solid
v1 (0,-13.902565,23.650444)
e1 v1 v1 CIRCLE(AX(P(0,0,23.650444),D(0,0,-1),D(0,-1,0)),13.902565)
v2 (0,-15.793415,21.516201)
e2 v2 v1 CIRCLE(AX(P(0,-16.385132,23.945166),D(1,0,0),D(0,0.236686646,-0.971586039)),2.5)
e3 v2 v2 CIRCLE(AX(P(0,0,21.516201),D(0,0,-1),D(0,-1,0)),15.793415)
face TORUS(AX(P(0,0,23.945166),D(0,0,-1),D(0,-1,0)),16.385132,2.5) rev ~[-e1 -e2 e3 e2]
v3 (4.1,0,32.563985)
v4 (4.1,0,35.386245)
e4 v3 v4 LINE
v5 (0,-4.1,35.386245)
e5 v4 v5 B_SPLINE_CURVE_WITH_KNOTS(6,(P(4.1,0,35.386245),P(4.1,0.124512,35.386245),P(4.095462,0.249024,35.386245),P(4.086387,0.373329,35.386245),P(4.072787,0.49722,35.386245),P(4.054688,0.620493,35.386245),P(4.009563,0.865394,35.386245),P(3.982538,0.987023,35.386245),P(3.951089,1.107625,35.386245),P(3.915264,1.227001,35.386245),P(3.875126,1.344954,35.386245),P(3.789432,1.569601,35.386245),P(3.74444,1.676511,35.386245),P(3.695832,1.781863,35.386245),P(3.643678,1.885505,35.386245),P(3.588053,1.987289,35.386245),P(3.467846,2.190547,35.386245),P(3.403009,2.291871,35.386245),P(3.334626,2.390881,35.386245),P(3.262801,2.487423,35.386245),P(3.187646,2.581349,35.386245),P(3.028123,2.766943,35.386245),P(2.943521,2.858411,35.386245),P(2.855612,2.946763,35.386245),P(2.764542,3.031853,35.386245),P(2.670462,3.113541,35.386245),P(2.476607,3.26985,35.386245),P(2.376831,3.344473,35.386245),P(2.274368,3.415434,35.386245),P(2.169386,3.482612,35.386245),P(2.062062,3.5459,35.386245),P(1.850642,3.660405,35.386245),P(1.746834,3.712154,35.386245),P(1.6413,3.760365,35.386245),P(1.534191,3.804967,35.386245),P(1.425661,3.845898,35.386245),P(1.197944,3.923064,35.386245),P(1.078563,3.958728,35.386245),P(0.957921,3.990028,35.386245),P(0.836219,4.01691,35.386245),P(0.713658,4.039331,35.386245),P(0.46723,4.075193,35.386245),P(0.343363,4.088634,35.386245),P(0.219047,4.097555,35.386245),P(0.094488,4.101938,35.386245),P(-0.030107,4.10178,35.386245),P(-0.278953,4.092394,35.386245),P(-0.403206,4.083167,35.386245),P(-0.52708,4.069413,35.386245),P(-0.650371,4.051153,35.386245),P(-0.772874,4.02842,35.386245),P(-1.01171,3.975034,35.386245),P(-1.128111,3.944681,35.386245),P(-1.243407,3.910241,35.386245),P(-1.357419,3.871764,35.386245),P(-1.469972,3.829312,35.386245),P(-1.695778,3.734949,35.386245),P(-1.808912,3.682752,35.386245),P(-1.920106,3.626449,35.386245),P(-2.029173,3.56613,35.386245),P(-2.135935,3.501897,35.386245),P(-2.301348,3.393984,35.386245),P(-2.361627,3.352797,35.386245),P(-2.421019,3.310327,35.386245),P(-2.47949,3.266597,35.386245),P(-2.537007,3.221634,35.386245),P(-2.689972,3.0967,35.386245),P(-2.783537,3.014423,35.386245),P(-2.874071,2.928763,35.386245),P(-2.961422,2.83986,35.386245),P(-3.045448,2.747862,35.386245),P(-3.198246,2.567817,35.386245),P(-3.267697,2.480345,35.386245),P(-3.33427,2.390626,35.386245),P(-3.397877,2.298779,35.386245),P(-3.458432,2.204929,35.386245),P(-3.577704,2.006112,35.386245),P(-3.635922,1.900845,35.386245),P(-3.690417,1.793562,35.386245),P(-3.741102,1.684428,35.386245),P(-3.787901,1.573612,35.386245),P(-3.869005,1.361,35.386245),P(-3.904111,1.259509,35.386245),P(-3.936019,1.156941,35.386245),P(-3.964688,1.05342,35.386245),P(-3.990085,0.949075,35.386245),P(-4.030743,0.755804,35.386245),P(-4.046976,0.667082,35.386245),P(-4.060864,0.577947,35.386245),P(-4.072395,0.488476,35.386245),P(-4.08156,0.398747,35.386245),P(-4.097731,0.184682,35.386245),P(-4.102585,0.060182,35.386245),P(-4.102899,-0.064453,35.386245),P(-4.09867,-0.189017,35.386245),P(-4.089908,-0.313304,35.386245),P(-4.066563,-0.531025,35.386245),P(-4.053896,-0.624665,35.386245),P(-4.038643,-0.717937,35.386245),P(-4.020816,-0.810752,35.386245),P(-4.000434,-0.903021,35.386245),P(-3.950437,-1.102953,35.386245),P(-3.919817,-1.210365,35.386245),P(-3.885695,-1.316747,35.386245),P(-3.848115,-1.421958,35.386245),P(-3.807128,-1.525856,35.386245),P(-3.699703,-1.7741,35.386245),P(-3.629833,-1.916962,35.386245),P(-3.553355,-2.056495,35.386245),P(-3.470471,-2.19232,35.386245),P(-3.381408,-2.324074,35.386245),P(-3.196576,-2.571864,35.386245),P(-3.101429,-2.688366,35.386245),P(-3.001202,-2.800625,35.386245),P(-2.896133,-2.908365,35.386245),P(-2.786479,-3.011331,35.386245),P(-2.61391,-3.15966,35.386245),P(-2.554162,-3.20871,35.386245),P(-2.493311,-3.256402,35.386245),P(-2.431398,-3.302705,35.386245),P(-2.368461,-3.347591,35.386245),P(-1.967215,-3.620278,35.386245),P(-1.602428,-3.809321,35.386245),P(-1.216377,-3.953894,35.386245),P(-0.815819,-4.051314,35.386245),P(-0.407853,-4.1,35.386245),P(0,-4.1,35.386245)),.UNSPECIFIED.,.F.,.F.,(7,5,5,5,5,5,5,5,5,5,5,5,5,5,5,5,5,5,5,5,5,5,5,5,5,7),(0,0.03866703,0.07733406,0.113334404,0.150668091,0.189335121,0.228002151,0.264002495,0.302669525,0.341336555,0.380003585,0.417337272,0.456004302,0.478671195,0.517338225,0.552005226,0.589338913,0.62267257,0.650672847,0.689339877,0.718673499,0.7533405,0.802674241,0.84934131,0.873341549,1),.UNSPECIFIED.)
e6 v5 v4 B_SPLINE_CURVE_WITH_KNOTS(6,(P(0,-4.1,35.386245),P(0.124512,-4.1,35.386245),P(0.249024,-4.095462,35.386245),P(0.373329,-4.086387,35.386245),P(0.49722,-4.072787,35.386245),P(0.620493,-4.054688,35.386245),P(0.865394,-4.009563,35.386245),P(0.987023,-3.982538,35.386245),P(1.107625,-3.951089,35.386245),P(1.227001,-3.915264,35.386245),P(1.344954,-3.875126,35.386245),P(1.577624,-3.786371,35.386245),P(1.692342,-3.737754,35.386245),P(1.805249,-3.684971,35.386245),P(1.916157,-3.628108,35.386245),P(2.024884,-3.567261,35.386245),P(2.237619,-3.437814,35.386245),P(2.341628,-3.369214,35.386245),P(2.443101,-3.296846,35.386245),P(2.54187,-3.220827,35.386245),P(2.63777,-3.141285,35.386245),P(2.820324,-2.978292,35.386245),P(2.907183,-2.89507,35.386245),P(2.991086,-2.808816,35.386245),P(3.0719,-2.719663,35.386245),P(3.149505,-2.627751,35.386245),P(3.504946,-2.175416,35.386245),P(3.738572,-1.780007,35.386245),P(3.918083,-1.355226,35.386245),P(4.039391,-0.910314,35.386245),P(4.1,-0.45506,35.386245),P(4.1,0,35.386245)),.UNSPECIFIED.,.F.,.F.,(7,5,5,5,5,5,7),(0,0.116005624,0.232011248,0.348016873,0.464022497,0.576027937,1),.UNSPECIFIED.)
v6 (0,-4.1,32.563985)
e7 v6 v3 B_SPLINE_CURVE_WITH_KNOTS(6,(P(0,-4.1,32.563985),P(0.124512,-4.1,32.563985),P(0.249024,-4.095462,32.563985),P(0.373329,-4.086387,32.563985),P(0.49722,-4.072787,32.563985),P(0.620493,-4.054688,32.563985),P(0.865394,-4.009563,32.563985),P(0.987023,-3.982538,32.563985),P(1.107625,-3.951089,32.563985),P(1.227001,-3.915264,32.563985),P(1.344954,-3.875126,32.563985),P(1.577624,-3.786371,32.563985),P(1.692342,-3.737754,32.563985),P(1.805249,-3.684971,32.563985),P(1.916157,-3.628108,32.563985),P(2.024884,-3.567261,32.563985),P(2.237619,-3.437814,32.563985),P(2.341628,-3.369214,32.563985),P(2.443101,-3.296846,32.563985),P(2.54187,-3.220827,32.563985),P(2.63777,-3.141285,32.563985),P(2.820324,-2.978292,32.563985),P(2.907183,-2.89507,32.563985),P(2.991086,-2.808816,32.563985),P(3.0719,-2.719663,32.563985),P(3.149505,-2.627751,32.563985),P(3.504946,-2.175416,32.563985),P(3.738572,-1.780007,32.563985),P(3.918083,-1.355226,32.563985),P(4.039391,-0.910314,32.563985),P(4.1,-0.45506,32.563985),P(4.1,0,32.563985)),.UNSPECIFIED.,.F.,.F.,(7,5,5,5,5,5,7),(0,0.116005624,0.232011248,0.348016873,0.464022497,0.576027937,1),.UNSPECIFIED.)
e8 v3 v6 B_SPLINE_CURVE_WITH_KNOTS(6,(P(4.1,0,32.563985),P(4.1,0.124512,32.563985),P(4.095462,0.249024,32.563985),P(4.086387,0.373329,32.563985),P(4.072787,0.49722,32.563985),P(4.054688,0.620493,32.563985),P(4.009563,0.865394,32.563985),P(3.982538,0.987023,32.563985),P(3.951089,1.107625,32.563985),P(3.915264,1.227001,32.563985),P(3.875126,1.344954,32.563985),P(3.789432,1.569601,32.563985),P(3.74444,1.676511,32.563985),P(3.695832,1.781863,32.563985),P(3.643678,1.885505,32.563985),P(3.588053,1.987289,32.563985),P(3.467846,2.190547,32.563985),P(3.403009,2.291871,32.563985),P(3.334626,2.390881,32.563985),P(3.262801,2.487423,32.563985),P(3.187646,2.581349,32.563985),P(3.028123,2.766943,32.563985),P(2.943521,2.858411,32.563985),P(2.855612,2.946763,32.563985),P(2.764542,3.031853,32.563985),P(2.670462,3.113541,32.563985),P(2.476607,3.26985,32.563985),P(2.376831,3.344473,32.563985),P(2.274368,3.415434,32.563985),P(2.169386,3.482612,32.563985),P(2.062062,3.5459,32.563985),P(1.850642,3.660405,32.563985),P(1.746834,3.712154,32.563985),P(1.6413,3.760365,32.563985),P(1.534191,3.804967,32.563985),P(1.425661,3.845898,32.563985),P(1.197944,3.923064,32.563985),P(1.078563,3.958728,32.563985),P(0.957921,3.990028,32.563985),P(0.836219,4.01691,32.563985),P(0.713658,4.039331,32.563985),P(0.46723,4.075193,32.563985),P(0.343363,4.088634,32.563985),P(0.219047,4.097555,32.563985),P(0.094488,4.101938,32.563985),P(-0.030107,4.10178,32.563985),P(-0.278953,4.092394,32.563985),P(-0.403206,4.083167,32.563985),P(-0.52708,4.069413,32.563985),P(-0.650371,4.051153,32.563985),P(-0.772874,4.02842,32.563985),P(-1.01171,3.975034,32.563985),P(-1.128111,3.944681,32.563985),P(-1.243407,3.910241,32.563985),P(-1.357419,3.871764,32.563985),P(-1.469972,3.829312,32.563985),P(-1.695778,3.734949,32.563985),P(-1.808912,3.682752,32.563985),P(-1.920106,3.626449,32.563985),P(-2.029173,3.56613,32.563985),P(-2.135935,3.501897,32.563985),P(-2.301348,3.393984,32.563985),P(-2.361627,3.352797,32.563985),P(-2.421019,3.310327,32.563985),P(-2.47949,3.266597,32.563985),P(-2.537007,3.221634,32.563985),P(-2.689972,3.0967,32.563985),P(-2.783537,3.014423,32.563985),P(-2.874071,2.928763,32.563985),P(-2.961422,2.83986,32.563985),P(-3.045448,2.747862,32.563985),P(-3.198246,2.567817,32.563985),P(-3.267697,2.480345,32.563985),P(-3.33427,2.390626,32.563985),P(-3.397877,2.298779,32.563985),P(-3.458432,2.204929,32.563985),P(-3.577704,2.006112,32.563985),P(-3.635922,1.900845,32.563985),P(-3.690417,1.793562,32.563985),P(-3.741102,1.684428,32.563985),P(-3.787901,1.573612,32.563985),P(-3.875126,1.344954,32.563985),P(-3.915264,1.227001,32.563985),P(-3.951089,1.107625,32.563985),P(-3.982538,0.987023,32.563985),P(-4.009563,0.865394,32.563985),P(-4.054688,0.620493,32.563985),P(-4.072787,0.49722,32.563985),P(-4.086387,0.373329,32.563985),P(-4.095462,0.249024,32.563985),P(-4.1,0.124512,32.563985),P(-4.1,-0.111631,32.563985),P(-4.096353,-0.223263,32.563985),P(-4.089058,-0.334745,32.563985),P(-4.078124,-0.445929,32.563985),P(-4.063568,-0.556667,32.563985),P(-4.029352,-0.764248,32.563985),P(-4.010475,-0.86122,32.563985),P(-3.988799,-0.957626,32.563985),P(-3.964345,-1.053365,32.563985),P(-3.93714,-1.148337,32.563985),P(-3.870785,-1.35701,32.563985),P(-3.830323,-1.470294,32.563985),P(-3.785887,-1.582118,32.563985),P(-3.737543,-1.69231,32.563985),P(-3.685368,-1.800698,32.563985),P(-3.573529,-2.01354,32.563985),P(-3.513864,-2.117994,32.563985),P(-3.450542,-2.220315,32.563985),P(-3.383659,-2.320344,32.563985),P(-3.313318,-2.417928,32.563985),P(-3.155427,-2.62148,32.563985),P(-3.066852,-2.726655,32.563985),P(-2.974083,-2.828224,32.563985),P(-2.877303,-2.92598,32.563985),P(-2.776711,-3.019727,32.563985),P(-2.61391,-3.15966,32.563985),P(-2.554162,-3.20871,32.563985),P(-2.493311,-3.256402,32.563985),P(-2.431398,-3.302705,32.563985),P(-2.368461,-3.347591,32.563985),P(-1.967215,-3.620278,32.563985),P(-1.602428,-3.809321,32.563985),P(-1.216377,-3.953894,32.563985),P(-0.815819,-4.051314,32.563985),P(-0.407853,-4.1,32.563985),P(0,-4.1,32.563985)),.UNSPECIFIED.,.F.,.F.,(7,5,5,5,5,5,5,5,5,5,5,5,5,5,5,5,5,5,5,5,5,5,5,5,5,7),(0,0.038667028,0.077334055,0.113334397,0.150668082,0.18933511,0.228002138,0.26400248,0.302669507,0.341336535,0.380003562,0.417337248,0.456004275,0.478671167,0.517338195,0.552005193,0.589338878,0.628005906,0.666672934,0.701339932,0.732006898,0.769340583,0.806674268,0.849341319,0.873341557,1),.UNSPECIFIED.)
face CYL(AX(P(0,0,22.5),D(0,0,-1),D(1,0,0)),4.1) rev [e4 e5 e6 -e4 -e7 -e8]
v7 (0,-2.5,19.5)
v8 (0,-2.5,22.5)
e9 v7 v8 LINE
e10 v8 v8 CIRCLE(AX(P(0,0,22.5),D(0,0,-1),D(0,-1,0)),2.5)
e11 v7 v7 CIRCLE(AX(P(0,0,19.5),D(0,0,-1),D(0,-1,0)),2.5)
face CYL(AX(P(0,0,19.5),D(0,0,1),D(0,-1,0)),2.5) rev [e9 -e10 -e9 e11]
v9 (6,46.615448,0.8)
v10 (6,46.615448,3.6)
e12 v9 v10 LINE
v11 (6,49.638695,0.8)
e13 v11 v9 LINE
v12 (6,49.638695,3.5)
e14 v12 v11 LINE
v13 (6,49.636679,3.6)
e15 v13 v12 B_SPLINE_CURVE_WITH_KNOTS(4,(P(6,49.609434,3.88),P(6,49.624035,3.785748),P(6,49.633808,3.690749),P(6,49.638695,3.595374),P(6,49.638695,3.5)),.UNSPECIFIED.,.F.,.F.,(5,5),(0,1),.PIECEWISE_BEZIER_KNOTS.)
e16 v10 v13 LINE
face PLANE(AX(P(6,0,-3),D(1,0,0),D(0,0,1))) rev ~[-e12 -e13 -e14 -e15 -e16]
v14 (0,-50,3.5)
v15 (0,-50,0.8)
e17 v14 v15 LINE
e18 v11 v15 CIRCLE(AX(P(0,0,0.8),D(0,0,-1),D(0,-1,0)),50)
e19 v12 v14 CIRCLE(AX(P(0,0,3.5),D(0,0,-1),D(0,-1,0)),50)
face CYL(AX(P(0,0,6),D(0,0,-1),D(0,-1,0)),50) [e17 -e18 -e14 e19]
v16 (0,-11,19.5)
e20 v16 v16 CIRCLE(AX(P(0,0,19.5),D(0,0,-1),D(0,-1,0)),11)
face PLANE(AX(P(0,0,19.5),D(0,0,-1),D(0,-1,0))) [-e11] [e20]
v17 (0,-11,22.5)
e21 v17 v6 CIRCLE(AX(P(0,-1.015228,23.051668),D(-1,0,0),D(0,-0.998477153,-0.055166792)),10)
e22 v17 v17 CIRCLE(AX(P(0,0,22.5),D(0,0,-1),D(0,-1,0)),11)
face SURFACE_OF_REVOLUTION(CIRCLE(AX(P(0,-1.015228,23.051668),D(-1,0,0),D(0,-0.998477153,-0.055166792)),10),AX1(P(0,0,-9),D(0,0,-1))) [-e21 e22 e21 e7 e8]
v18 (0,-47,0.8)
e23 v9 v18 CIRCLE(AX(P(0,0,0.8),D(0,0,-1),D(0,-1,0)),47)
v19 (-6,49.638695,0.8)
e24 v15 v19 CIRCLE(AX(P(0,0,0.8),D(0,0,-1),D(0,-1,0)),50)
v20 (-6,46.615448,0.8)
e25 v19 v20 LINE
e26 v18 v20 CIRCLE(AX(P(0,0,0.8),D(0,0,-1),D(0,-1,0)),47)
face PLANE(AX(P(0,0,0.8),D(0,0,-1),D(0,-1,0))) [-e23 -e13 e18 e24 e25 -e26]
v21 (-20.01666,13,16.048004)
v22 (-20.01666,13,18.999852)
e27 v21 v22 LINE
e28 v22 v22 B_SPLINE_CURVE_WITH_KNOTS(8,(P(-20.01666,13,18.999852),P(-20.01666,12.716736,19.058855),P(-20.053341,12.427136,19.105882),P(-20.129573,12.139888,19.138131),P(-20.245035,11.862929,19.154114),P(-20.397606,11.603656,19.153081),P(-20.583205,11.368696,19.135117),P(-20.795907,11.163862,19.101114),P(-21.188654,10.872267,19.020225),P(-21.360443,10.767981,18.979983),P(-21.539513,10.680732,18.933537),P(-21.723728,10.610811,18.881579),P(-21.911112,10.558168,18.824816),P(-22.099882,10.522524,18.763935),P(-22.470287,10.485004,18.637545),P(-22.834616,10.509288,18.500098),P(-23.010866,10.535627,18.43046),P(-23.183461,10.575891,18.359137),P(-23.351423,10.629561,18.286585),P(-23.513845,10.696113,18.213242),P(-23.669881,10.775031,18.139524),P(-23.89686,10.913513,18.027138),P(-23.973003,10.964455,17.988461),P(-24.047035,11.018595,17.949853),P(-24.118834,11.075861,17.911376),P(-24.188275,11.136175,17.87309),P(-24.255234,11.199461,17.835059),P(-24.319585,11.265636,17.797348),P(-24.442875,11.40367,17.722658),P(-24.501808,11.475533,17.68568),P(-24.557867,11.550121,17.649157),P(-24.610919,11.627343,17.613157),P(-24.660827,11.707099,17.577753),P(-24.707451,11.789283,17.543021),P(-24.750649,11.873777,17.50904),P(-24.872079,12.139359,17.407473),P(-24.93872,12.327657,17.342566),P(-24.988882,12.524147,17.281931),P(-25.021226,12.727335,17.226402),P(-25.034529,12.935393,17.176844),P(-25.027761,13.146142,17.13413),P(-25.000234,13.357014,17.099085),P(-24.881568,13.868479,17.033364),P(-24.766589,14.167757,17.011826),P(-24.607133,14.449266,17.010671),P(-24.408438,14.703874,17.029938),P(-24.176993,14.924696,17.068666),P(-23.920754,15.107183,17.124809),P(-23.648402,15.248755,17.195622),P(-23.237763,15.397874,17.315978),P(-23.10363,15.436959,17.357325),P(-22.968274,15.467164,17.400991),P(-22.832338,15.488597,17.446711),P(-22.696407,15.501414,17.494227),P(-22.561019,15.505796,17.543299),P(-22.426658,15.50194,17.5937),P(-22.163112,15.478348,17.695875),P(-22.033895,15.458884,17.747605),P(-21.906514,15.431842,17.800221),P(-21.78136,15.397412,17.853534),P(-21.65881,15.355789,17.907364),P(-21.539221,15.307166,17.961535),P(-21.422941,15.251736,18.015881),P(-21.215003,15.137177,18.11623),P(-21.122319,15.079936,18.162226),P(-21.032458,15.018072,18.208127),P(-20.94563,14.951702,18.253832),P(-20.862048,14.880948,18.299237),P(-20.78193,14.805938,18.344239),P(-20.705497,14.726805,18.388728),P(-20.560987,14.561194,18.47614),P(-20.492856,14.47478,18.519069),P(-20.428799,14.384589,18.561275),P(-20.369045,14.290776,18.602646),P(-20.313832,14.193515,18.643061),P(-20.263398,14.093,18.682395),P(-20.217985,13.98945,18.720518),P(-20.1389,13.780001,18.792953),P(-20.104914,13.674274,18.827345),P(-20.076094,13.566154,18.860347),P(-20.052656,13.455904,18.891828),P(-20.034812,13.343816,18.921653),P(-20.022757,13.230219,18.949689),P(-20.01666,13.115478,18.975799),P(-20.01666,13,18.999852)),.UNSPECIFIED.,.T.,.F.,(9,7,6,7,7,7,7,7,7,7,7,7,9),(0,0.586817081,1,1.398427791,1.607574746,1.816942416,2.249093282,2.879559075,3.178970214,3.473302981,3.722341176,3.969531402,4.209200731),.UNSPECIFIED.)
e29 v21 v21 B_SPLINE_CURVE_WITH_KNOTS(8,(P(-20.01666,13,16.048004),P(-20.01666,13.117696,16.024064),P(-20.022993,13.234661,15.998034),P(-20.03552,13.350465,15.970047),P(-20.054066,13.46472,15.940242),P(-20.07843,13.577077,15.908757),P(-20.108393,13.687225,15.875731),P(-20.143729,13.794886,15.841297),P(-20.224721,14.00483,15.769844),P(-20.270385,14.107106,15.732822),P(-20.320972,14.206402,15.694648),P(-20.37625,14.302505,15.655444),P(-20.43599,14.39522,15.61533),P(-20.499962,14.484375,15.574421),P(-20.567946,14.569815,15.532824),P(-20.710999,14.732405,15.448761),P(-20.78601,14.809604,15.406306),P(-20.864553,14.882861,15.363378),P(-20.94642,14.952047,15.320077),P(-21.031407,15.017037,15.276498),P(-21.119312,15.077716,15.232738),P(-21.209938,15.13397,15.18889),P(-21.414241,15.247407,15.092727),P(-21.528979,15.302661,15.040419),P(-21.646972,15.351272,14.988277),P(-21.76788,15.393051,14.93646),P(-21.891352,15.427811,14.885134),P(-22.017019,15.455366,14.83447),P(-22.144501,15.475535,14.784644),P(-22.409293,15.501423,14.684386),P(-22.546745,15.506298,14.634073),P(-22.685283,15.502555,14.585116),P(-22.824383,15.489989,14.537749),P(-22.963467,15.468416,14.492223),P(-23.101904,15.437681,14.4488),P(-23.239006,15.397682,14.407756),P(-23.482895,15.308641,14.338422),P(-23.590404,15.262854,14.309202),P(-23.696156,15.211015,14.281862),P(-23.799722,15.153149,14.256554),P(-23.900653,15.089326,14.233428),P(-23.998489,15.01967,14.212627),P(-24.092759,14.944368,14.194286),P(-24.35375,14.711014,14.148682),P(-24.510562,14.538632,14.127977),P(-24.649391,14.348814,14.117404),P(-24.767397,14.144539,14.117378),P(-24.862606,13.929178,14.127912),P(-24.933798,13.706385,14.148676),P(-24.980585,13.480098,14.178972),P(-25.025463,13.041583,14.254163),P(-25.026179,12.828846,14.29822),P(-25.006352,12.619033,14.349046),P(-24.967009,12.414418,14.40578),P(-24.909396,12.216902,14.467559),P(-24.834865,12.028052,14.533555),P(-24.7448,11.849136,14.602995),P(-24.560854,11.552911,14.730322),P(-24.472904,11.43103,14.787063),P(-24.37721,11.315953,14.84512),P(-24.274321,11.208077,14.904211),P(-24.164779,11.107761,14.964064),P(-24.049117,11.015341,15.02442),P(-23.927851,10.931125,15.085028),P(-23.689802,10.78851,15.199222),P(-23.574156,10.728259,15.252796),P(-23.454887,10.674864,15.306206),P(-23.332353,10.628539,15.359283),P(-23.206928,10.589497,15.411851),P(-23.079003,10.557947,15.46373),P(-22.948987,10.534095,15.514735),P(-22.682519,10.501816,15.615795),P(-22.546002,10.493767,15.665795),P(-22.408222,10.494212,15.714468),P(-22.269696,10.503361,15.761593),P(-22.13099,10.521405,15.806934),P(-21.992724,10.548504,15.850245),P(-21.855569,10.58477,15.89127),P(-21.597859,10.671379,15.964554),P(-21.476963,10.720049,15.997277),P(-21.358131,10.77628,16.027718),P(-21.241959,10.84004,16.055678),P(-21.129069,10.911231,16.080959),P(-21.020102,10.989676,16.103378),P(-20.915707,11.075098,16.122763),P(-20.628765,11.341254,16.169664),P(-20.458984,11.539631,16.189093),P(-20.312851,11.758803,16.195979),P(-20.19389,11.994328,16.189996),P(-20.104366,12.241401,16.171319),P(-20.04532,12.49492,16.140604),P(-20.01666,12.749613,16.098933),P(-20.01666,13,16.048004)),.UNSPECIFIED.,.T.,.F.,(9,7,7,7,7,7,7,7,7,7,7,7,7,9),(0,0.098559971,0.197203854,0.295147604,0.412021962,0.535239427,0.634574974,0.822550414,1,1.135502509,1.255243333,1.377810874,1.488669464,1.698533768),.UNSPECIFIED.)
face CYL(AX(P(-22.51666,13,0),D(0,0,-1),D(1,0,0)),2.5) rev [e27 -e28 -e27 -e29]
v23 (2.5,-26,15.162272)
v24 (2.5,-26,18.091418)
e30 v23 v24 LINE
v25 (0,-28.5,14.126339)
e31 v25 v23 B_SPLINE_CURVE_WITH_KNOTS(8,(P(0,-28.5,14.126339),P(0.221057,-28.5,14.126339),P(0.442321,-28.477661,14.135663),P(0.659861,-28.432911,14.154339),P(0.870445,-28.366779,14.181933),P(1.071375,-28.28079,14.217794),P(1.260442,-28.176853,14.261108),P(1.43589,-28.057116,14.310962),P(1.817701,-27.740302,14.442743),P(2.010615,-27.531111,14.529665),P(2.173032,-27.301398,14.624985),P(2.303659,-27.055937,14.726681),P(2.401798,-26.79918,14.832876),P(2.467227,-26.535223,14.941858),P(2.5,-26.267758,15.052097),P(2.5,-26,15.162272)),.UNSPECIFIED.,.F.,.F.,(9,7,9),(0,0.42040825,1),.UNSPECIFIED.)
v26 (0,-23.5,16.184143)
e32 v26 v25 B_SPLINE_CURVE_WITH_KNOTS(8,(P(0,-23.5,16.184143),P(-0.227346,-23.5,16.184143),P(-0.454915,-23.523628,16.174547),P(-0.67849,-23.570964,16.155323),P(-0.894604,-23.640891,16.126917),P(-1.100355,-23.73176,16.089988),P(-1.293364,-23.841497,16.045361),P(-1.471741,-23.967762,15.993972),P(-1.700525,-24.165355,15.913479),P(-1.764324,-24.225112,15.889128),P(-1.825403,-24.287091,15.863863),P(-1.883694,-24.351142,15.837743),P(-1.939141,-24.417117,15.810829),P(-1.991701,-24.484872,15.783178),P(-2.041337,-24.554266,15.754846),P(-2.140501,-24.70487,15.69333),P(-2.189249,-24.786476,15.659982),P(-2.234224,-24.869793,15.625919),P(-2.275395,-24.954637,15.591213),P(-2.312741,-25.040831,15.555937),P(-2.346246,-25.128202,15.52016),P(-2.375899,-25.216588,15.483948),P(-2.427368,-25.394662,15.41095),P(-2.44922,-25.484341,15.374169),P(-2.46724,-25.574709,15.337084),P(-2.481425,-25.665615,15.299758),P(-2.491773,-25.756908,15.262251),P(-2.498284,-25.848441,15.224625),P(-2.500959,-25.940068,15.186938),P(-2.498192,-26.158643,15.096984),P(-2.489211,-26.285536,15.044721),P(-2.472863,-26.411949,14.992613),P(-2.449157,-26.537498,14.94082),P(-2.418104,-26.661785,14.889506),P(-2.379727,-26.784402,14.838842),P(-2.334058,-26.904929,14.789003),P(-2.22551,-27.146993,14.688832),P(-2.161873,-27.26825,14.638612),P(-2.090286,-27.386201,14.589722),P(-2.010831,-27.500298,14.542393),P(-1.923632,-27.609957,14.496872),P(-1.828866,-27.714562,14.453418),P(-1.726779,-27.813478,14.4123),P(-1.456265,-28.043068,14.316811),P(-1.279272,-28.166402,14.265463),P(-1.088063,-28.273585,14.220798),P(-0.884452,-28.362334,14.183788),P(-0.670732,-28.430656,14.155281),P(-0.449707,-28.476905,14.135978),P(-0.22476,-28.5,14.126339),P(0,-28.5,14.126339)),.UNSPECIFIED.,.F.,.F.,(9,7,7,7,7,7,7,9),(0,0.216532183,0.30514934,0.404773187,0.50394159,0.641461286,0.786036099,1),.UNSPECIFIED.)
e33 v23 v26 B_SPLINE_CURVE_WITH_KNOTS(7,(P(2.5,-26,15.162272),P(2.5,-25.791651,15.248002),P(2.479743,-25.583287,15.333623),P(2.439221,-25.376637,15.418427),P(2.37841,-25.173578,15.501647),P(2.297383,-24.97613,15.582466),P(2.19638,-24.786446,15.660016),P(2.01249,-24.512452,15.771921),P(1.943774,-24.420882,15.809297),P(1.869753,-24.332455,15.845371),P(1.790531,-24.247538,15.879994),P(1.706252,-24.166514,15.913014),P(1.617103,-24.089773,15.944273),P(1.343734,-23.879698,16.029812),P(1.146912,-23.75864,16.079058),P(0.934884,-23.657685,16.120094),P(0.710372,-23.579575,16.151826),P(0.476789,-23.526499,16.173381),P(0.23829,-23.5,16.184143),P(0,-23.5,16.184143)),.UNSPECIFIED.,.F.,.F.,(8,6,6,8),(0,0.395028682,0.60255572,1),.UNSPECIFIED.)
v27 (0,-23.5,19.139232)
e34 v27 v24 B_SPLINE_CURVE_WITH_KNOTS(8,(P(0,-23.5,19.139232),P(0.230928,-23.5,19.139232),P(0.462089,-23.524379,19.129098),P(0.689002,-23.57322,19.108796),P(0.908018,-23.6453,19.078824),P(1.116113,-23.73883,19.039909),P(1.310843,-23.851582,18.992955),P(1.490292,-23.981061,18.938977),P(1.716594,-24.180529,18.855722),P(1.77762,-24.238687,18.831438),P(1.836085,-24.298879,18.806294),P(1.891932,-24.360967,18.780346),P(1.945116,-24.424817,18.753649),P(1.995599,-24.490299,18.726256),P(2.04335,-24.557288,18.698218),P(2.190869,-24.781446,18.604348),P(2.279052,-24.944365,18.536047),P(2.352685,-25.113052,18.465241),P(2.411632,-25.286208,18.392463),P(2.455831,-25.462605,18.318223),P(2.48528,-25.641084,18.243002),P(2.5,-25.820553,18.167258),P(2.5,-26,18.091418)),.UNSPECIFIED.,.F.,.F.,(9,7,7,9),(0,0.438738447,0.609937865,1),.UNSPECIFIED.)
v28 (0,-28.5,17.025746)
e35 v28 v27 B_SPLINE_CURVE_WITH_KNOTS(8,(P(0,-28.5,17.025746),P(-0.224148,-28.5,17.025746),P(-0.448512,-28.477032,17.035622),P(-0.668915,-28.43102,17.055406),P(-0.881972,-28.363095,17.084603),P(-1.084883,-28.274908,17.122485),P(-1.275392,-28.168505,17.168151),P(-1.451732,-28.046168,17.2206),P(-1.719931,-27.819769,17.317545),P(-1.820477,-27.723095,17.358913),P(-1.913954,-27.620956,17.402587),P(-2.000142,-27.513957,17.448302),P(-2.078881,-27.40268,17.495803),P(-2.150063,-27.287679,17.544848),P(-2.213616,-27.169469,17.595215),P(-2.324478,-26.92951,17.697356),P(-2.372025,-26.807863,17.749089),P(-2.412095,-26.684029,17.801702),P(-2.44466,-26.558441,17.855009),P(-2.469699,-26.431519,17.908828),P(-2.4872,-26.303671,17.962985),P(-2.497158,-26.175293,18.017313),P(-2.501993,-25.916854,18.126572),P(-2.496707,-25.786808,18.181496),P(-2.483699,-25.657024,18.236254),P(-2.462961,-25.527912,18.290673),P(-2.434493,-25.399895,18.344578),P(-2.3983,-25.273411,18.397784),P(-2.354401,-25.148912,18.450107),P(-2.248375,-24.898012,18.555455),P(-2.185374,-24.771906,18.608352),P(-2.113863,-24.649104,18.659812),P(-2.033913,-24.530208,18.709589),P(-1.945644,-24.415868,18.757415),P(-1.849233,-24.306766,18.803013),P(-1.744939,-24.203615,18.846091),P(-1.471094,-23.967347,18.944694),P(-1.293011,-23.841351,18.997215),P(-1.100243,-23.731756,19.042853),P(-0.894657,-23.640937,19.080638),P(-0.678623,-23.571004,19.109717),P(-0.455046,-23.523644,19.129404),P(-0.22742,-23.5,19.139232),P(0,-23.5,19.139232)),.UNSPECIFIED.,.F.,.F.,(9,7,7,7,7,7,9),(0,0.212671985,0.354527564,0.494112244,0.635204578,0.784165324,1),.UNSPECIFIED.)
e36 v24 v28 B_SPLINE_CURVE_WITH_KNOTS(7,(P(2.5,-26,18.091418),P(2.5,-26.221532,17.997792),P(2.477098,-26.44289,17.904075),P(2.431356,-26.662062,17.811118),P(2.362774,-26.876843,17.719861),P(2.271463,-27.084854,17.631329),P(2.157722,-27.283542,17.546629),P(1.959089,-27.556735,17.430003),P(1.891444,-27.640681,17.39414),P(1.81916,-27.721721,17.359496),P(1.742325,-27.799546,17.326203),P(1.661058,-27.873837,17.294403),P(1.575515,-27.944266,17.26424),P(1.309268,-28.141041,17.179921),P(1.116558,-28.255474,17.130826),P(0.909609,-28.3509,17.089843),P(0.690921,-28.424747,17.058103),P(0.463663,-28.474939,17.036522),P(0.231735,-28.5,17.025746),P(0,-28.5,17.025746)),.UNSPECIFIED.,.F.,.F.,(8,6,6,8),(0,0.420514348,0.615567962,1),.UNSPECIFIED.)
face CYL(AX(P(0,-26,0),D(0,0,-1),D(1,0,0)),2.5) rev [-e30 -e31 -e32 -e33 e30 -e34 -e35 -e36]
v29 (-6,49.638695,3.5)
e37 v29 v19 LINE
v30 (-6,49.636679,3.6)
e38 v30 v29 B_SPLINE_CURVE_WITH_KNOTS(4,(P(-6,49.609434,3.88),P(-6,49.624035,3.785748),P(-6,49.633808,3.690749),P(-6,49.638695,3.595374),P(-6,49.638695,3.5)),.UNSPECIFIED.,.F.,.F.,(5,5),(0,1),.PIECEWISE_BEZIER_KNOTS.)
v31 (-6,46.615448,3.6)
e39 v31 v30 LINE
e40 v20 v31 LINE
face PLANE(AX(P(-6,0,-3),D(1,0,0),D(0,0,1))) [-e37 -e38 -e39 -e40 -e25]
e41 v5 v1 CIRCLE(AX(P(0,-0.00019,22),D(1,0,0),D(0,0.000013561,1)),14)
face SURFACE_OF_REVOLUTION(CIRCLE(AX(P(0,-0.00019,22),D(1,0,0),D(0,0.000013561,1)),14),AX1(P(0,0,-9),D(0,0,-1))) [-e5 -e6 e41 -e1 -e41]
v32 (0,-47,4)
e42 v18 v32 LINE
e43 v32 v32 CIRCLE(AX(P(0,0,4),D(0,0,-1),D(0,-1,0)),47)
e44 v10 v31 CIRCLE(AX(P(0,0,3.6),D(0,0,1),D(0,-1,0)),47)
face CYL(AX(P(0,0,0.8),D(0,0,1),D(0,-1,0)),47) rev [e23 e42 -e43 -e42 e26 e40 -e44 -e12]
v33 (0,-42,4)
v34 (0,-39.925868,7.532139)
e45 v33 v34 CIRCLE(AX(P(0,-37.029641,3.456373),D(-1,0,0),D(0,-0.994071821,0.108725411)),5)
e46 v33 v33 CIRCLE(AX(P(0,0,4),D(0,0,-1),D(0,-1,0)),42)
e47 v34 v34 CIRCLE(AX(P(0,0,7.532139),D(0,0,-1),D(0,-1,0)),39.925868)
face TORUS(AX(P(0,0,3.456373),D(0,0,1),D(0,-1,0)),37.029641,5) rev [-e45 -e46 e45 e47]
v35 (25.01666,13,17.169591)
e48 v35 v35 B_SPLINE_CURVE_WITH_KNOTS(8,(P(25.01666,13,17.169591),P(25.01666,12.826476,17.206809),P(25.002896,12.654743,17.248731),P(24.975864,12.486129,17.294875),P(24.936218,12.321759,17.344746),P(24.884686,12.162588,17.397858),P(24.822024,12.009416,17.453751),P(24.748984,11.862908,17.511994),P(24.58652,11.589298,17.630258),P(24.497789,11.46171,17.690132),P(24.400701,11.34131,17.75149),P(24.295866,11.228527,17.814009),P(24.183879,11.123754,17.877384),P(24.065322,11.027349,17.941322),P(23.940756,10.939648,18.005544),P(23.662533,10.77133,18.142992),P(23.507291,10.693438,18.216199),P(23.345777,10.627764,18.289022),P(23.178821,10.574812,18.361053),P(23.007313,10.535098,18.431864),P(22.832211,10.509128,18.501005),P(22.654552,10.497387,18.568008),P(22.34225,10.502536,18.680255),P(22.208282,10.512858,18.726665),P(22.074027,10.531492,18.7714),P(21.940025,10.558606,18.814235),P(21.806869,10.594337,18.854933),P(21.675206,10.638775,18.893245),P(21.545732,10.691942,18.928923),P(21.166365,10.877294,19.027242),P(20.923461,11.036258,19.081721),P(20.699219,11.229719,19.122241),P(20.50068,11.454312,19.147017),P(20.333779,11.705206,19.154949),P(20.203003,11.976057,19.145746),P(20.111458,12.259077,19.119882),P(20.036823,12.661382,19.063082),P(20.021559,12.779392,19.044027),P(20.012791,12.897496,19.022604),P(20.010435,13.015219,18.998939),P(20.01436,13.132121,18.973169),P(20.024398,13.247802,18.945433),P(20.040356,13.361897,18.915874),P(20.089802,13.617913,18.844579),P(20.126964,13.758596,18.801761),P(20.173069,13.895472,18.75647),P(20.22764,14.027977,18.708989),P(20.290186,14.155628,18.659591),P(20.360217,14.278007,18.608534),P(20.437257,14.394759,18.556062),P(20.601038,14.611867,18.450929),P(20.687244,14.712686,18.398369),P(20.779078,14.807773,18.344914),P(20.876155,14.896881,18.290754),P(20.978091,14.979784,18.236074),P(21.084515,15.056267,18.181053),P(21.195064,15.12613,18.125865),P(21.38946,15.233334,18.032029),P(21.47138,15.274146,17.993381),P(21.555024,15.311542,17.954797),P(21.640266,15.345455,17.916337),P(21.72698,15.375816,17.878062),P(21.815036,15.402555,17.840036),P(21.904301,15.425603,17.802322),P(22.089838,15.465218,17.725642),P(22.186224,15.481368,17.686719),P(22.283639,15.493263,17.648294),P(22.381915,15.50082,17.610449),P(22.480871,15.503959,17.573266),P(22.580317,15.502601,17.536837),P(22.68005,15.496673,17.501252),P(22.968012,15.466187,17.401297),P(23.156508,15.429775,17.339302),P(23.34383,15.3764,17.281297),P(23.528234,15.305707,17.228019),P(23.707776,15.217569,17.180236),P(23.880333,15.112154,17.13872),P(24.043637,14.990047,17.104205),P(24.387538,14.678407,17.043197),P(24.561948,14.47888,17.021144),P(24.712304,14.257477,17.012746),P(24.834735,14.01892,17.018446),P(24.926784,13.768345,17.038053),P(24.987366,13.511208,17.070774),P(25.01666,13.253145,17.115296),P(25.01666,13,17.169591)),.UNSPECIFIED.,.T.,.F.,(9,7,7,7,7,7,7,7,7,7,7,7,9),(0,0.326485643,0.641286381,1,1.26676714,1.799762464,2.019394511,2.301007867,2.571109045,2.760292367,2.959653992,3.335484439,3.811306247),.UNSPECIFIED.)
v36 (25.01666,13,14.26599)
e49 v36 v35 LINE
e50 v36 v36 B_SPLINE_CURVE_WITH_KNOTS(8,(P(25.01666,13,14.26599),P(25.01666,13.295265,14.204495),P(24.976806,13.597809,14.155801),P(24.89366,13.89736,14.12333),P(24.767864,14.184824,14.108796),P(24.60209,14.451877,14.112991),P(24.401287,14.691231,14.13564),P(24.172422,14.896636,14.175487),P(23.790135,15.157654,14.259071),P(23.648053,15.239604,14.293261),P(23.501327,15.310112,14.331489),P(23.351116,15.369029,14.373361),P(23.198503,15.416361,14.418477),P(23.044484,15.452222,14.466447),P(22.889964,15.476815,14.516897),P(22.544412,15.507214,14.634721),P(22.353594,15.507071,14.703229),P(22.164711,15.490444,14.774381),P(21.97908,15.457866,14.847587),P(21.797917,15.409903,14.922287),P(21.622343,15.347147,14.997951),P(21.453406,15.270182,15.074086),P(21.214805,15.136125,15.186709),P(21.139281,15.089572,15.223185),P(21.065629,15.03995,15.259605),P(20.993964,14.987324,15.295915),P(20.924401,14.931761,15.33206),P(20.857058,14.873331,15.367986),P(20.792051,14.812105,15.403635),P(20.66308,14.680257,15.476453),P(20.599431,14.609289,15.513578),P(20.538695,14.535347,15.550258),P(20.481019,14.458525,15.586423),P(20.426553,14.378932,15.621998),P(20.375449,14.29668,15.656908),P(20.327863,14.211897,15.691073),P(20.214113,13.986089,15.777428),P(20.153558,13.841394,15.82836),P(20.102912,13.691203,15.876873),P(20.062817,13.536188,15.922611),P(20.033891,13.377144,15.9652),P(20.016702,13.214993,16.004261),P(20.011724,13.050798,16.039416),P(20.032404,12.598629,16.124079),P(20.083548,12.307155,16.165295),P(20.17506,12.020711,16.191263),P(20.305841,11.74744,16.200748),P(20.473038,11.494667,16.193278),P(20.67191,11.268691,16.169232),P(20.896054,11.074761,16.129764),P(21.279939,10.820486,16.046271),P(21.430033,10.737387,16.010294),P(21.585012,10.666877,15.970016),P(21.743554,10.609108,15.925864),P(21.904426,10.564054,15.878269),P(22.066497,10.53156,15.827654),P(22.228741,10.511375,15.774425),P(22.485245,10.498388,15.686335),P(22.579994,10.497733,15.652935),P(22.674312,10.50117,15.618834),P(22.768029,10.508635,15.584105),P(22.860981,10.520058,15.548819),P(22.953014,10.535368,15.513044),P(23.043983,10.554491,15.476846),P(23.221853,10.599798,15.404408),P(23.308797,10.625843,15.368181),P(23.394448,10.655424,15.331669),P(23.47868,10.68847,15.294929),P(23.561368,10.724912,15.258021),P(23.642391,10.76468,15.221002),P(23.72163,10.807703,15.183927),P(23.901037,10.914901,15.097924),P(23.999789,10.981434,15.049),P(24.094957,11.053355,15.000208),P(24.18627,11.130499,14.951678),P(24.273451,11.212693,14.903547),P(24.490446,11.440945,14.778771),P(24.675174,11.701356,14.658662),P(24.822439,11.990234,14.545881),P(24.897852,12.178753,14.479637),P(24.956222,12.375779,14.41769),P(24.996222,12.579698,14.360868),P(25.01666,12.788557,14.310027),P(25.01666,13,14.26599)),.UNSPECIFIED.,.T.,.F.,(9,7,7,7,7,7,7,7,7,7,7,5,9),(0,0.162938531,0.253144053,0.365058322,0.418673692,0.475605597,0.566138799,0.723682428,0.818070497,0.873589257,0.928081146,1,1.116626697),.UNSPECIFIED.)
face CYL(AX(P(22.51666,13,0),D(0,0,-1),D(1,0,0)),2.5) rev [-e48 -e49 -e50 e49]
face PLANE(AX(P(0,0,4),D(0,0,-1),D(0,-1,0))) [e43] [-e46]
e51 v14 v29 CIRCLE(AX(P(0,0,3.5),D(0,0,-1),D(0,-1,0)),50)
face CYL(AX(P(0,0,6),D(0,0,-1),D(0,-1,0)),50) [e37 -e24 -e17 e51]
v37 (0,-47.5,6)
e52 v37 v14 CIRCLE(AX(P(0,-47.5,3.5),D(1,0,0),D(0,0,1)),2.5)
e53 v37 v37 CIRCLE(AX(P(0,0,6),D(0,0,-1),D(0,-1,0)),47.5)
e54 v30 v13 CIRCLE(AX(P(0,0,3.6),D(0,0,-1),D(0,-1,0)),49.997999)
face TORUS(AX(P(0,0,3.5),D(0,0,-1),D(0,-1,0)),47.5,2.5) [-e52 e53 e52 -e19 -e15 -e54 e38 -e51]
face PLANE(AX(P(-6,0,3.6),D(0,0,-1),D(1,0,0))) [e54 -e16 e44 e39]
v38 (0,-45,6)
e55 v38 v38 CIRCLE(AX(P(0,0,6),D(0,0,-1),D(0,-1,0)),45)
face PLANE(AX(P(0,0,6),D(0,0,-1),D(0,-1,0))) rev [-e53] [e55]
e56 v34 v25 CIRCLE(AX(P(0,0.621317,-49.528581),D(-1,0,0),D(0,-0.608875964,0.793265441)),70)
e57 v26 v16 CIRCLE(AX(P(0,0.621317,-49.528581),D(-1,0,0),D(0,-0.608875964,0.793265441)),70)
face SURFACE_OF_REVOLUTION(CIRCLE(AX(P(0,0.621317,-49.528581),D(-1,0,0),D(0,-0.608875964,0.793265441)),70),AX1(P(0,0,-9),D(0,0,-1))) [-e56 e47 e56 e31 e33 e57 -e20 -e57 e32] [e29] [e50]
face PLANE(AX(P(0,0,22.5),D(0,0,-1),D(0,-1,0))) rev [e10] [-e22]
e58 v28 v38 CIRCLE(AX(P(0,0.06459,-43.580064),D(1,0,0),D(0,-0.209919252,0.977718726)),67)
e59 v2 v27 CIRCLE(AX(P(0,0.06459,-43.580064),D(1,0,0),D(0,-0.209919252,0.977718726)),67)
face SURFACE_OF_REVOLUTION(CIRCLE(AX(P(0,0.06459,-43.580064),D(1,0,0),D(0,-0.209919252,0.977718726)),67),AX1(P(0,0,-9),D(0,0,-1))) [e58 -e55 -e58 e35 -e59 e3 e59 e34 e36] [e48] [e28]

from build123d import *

# Parameters (mm, degrees)
F2_R      = 20
F3_DEPTH  = 25
F4_R      = 2.5
F5_DEPTH  = 25
F7_W      = 12
F7_H      = 6.6
F8_DEPTH  = 60
F9_R      = 4.1
F9_R_2    = 2.5
F10_DEPTH = 15


# Not quite as in the source:
# - a fillet or chamfer that OpenCascade refuses, or shapes differently, is made with other operations: its cross-section is extruded or revolved along the edge and cut away or added
# - a feature names something its author has since deleted; it is built from what else it names


with BuildPart() as f1:
    # F0 (on Right) → F1 (revolve)
    with BuildSketch(Plane.YZ):
        with BuildLine():
            Line((-47, 0.8), (-47, 2))
            Line((-47, 2), (-47, 4))
            Line((-47, 4), (-42, 4))
            Line((-42, 4), (-42, 6))
            ThreePointArc((-42, 6), (-27.3273562245, 14.6498550341), (-11, 19.5))
            Line((-11, 19.5), (-2.5, 19.5))
            Line((-2.5, 19.5), (-2.5, 22.5))
            Line((-2.5, 22.5), (-11, 22.5))
            ThreePointArc((-11, 22.5), (-7.9199859369, 30.2852233625), (0, 33))
            Line((0, 33), (0, 36))
            ThreePointArc((0, 36), (-9.9253616904, 31.873751261), (-14, 21.9270907164))
            ThreePointArc((-14, 21.9270907164), (-30.5537547763, 16.0145412775), (-45, 6))
            Line((-45, 6), (-50, 6))
            Line((-50, 6), (-50, 0.8))
            Line((-50, 0.8), (-47, 0.8))
        make_face()
    revolve(axis=Axis((0, 0, -9), (0, 0, -1)))

    # F2 (on Top) → F3 (cut)
    with BuildSketch(Plane.XY):
        Circle(F2_R)
    extrude(amount=-F3_DEPTH, mode=Mode.SUBTRACT)

    # F4 (on Top) → F5 (cut)
    with BuildSketch(Plane.XY):
        with Locations((0, -26)):
            Circle(F4_R)
        with Locations((-22.5166604984, 13)):
            Circle(F4_R)
        with Locations((22.5166604984, 13)):
            Circle(F4_R)
    extrude(amount=F5_DEPTH, mode=Mode.SUBTRACT)

    # F6: fillet of radius 5 on 1 edges, made by hand

    # F6_s1 → F6_t2 (revolve)
    with BuildSketch(Plane.YZ):
        with BuildLine():
            ThreePointArc((-42, 4), (-41.3412296148, 5.9882107587), (-39.9258684636, 7.532138624))
            ThreePointArc((-39.9258684636, 7.532138624), (-40.9699899366, 6.7756209672), (-42, 6))
            Line((-42, 6), (-42, 4))
        make_face()
    revolve(axis=Axis((0, 0, 6), (0, 0, -1)))

    # F7 (on Front) → F8 (cut)
    with BuildSketch(Plane.XZ):
        with Locations((0, 0.3)):
            Rectangle(F7_W, F7_H)
    extrude(amount=-F8_DEPTH, mode=Mode.SUBTRACT)

    # F9 (on face) → F10 (cut)
    with BuildSketch(Plane.XY.offset(22.5)):
        Circle(F9_R)
        Circle(F9_R_2, mode=Mode.SUBTRACT)
        Circle(F9_R_2)
    extrude(amount=F10_DEPTH, mode=Mode.SUBTRACT)

    # F11: fillet of radius 2.5 on 2 edges, made by hand

    # F11_s1 → F11_t2 (revolve)
    with BuildSketch(Plane.YZ):
        with BuildLine():
            ThreePointArc((-15.7934154108, 21.5162006837), (-14.513888258, 22.2873217713), (-13.902565029, 23.6504436939))
            ThreePointArc((-13.902565029, 23.6504436939), (-13.9778675149, 22.7902702686), (-14, 21.9270907164))
            ThreePointArc((-14, 21.9270907164), (-14.8981182002, 21.7278020994), (-15.7934154108, 21.5162006837))
        make_face()
    revolve(axis=Axis((0, 0, 21.9270907164), (0, 0, -1)))

    # F11_s3 → F11_t4 (revolve, cut)
    with BuildSketch(Plane.YZ):
        with BuildLine():
            ThreePointArc((-47.5, 6), (-49.267766953, 5.267766953), (-50, 3.5))
            Line((-50, 3.5), (-50, 6))
            Line((-50, 6), (-47.5, 6))
        make_face()
    revolve(axis=Axis((0, 0, 6), (0, 0, -1)), mode=Mode.SUBTRACT)


solid = f1.part
